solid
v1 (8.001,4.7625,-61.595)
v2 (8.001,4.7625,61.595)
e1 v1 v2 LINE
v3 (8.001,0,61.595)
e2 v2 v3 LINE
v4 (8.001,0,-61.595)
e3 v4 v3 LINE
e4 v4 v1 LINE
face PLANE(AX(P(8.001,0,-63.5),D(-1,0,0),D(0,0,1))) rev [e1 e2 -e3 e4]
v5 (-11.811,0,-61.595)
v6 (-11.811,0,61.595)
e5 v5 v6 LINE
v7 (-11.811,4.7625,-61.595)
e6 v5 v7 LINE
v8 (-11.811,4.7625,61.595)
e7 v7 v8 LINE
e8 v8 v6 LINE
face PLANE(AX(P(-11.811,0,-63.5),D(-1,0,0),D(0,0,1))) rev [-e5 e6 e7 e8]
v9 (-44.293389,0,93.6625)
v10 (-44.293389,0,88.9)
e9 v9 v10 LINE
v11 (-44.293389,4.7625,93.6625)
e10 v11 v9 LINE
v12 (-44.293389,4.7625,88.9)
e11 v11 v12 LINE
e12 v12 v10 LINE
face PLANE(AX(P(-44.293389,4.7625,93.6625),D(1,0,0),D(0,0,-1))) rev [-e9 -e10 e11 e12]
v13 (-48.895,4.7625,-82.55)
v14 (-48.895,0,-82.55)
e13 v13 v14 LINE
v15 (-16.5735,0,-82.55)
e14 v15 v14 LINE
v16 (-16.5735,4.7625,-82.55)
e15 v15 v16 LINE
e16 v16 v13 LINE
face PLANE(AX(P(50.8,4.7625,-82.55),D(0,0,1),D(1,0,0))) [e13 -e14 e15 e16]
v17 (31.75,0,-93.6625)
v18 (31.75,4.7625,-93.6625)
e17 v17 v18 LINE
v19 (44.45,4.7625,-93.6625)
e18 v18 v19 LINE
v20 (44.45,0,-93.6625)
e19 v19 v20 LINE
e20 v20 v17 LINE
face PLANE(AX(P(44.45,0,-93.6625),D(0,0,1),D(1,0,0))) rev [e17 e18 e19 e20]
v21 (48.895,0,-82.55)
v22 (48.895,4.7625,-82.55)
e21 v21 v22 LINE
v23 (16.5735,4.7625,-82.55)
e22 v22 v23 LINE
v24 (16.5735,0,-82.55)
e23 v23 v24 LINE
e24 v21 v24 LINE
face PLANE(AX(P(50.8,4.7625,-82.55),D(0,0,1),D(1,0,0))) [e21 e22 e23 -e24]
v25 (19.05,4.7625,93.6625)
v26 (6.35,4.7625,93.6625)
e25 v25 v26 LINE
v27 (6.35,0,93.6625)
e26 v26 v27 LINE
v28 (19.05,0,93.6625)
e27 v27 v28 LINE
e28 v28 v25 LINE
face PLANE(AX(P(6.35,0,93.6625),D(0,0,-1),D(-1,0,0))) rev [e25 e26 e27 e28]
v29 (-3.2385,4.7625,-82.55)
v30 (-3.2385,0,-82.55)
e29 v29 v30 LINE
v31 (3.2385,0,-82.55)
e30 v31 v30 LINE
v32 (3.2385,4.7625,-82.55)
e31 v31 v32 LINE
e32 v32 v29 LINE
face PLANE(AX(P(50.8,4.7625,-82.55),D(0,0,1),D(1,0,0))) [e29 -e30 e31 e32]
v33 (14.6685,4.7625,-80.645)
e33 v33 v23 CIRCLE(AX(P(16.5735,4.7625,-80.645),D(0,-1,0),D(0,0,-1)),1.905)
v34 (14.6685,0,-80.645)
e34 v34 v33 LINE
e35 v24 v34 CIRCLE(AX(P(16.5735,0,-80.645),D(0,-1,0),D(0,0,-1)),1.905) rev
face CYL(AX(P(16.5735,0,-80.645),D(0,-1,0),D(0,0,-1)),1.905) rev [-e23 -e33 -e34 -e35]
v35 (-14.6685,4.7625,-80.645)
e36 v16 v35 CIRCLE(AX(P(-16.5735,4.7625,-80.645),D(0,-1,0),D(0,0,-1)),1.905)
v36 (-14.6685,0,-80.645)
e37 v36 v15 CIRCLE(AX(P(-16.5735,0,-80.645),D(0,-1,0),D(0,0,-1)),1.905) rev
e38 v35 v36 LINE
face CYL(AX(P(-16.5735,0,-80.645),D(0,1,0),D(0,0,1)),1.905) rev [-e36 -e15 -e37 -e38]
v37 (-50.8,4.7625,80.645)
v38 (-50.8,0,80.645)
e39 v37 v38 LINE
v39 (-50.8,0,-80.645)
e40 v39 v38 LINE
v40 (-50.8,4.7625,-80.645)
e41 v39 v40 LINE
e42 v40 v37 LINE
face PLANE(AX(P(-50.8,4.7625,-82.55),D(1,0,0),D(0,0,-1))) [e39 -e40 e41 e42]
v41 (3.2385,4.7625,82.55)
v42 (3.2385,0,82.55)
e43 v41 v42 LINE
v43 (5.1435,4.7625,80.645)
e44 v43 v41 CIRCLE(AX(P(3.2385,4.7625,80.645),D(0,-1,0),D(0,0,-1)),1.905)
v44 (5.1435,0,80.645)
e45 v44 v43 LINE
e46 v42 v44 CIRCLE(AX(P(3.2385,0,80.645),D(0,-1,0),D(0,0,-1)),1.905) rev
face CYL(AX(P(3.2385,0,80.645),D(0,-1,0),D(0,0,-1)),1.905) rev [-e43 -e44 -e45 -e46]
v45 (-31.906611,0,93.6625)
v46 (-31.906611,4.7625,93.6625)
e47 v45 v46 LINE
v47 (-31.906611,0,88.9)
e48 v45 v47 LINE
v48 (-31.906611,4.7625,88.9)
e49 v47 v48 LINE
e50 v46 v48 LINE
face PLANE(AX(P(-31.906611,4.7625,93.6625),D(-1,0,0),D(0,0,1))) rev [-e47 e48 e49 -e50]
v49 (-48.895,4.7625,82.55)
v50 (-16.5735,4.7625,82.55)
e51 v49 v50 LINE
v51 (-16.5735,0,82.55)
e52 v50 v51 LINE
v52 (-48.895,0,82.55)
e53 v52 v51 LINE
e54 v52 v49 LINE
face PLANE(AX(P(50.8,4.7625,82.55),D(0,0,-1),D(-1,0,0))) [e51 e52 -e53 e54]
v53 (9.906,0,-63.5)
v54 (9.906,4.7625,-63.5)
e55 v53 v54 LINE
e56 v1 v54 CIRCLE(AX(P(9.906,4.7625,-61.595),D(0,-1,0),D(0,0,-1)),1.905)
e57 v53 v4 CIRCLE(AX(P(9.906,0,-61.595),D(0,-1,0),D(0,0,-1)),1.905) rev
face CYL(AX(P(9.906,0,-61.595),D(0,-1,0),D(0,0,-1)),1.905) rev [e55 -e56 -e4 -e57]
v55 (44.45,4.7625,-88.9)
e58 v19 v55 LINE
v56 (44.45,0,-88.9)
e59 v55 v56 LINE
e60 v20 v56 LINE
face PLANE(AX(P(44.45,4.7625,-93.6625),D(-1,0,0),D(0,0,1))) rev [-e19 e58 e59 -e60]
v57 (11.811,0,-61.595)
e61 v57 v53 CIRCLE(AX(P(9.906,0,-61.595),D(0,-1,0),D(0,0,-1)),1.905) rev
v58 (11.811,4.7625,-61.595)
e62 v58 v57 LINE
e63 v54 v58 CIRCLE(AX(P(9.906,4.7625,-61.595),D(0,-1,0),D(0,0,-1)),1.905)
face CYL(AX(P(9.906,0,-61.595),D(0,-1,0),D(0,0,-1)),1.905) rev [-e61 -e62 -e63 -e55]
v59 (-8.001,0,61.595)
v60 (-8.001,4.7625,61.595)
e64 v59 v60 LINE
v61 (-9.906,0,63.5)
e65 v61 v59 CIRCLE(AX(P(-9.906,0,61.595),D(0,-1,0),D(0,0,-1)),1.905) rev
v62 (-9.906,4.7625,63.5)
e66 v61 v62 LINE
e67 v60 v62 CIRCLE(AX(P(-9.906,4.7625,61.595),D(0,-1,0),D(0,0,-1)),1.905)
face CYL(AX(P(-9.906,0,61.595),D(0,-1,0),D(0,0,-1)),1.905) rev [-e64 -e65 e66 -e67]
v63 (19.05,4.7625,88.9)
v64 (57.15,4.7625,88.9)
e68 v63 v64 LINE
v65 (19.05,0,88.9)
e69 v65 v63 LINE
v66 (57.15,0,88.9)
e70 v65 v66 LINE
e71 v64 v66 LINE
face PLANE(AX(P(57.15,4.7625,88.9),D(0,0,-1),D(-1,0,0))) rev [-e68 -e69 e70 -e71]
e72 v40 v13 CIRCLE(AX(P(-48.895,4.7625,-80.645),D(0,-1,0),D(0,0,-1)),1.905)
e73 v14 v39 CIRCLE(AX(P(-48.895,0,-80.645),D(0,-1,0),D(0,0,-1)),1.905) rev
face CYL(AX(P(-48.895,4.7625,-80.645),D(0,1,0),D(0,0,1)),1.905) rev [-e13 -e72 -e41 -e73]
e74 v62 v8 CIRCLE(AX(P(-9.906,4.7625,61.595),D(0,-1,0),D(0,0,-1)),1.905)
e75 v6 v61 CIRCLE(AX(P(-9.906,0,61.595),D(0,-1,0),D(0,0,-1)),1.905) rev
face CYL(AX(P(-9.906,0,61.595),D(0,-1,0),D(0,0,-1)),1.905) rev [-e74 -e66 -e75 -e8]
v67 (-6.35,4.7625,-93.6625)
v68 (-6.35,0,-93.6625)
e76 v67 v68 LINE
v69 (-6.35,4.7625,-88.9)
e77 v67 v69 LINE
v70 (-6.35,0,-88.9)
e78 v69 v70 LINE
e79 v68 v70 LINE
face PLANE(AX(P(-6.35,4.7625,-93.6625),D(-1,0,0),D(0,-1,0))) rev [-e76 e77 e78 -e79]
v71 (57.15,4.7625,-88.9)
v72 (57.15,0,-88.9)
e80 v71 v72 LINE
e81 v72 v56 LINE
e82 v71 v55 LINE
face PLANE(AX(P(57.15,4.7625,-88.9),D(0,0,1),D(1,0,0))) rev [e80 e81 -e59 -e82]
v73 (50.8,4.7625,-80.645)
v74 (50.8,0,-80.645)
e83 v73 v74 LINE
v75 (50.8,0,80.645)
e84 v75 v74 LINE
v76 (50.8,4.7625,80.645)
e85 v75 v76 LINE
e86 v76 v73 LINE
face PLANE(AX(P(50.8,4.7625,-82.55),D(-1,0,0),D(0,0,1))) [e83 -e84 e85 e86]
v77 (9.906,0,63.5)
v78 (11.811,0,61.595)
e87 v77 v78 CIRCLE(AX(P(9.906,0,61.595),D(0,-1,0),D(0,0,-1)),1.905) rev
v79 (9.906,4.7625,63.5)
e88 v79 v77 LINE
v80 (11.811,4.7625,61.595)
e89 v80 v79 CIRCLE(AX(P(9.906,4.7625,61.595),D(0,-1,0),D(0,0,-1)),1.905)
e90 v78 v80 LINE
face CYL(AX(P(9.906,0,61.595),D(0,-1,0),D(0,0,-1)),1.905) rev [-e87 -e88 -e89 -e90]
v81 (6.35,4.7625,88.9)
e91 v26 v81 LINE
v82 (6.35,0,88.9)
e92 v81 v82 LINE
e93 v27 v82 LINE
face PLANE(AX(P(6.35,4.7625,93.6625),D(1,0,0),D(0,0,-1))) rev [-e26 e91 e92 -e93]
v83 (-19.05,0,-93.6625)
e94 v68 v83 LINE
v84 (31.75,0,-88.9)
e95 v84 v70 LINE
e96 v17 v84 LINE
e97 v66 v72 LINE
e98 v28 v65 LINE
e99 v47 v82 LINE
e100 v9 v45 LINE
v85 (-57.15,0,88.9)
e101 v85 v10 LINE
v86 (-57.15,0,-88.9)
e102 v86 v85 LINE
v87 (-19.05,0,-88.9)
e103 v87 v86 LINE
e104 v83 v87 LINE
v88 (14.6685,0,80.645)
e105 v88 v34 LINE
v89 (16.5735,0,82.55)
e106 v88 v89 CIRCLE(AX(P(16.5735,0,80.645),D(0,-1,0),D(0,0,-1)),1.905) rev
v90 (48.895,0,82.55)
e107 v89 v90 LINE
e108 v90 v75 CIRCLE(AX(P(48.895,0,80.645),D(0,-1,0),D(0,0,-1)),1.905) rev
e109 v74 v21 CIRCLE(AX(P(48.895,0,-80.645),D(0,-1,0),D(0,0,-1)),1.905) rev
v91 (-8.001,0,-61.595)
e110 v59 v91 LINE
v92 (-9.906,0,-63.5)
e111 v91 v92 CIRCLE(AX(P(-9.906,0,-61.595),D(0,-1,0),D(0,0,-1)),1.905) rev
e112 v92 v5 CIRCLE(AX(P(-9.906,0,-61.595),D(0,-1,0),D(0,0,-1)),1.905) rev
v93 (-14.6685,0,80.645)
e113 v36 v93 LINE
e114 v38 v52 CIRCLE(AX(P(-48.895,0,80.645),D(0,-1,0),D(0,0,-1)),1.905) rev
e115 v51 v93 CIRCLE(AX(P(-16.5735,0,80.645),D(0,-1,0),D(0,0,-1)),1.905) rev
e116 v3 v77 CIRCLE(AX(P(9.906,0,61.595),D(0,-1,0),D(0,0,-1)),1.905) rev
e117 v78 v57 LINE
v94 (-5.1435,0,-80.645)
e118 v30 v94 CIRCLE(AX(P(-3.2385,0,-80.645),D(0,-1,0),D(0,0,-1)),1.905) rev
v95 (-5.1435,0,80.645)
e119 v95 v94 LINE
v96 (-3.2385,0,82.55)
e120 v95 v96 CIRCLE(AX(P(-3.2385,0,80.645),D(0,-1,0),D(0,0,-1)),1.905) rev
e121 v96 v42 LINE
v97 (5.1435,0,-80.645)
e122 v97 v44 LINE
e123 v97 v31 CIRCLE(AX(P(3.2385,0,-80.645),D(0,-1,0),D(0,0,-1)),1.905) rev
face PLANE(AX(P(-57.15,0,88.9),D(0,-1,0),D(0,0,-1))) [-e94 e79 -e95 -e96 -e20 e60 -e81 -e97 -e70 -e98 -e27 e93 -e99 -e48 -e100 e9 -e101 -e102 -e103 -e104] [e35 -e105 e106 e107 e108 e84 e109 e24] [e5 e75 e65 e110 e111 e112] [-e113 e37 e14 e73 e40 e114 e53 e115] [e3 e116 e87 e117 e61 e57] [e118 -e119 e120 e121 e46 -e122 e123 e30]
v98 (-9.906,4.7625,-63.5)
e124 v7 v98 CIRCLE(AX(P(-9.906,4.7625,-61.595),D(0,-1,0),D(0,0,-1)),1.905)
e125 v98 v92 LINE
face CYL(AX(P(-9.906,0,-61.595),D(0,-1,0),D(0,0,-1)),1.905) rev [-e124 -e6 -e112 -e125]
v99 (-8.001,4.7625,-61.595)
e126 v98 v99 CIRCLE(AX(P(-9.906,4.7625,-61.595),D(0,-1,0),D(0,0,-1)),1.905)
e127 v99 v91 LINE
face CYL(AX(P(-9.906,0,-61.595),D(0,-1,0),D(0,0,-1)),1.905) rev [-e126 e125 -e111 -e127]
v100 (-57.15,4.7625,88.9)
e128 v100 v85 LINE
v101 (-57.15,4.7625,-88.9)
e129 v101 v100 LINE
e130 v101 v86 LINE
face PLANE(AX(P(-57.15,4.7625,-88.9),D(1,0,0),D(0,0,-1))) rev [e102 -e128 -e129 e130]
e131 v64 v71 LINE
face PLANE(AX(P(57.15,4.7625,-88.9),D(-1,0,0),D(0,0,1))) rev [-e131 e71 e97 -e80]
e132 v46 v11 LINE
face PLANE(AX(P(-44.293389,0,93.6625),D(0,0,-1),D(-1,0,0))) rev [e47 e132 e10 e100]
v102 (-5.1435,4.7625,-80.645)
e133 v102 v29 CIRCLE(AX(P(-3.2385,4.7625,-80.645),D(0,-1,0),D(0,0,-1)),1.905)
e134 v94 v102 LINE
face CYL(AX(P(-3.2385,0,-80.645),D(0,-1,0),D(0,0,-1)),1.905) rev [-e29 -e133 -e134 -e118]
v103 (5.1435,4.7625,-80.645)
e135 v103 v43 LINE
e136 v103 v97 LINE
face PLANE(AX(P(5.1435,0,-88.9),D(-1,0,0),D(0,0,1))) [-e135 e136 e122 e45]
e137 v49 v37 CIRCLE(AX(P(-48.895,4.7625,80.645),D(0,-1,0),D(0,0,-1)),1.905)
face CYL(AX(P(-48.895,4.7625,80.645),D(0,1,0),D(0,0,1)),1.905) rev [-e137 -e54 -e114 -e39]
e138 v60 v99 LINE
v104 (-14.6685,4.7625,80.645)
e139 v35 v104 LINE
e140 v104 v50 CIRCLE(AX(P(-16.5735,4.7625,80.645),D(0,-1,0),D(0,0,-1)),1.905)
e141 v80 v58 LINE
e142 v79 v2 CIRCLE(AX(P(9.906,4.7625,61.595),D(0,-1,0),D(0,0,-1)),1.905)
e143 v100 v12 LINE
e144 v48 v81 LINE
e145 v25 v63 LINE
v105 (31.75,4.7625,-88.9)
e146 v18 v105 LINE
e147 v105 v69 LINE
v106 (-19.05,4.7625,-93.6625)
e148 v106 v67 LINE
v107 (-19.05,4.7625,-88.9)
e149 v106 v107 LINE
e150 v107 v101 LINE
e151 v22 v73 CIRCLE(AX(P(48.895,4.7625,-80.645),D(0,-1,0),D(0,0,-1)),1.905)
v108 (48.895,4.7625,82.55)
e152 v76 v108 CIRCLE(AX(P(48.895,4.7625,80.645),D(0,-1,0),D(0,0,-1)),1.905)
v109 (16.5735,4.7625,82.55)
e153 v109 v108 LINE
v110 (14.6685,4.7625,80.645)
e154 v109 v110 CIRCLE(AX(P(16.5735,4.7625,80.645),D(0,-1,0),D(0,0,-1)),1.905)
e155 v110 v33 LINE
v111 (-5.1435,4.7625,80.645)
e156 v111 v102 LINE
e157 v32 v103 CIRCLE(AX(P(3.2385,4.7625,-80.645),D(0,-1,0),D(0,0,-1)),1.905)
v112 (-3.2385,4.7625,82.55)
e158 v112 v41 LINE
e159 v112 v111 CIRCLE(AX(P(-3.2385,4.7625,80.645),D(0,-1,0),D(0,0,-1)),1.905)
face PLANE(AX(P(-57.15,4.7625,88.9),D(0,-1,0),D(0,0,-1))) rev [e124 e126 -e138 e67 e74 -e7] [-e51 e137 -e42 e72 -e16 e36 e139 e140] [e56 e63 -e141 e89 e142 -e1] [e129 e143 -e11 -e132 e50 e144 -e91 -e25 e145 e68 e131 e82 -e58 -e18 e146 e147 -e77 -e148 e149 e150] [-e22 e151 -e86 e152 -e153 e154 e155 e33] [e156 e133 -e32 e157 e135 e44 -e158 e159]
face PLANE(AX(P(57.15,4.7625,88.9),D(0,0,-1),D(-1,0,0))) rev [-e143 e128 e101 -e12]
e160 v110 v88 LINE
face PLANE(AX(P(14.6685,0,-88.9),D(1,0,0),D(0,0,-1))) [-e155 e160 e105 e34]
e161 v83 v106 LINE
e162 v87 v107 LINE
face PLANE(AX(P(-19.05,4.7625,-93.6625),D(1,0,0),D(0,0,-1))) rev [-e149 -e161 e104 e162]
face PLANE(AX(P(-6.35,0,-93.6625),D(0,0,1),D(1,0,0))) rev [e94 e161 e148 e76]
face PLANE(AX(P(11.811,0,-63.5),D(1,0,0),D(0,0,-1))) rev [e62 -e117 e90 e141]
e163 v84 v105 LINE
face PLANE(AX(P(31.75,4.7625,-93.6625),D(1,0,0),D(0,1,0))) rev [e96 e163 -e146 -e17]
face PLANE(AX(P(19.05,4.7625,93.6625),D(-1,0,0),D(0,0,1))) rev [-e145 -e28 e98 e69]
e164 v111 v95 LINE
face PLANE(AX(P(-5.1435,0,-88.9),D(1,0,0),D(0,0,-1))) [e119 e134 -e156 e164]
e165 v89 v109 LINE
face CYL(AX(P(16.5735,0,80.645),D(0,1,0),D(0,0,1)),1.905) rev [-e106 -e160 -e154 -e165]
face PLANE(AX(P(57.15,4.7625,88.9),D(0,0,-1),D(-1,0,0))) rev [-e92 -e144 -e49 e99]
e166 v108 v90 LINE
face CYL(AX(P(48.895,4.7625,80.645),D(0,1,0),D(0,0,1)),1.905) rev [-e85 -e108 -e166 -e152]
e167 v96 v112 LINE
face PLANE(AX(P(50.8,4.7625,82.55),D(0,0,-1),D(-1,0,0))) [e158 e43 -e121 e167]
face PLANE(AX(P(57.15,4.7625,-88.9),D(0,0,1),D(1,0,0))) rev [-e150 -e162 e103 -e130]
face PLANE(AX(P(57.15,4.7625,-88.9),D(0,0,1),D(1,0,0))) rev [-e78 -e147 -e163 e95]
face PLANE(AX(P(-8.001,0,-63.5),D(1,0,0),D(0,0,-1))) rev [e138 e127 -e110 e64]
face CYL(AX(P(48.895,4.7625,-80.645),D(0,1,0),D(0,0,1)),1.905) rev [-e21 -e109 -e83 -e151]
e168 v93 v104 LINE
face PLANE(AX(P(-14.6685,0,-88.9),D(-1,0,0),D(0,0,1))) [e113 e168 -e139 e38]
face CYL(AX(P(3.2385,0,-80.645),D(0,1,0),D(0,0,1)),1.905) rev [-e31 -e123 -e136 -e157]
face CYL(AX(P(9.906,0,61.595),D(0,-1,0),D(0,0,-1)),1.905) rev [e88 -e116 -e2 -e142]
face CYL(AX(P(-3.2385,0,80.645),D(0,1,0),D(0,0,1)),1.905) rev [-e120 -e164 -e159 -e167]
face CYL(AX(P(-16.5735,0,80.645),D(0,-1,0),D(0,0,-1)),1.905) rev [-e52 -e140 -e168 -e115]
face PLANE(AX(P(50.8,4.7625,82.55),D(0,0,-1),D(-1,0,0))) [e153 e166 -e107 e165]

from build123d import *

# Parameters (mm, degrees)
SKETCH1_W           = 114.3
SKETCH1_H           = 177.8
SKETCH1_W_2         = 101.6
SKETCH1_H_2         = 165.1
BOSS_EXTRUDE1_DEPTH = 4.7625
SKETCH2_W           = 12.38677804
SKETCH2_H           = 4.7625
SKETCH2_W_2         = 12.7
BOSS_EXTRUDE2_DEPTH = 4.7625
SKETCH3_W           = 12.7
SKETCH3_H           = 4.7625
BOSS_EXTRUDE3_DEPTH = 4.7625
SKETCH4_W           = 9.525
SKETCH4_H           = 177.8
SKETCH4_W_2         = 3.81
SKETCH4_H_2         = 127
BOSS_EXTRUDE4_DEPTH = 4.7625
FILLET1_R           = 1.905


with BuildPart() as part:
    # Sketch1 → Boss-Extrude1 (new body)
    with BuildSketch(Plane(origin=(0, 0, 0), x_dir=(1, 0, 0), z_dir=(0, 1, 0))):
        Rectangle(SKETCH1_W, SKETCH1_H)
        Rectangle(SKETCH1_W_2, SKETCH1_H_2, mode=Mode.SUBTRACT)
    extrude(amount=BOSS_EXTRUDE1_DEPTH)

    # Sketch2 → Boss-Extrude2 (add)
    with BuildSketch(Plane.XY.offset(88.9)):
        with Locations((-38.1, 2.38125)):
            Rectangle(SKETCH2_W, SKETCH2_H)
        with Locations((12.7, 2.38125)):
            Rectangle(SKETCH2_W_2, SKETCH2_H)
    extrude(amount=BOSS_EXTRUDE2_DEPTH)

    # Sketch3 → Boss-Extrude3 (add)
    with BuildSketch(Plane(origin=(0, 0, -88.9), x_dir=(-1, 0, 0), z_dir=(0, 0, -1))):
        with Locations((-38.1, 2.38125)):
            Rectangle(SKETCH3_W, SKETCH3_H)
        with Locations((12.7, 2.38125)):
            Rectangle(SKETCH3_W, SKETCH3_H)
    extrude(amount=BOSS_EXTRUDE3_DEPTH)

    # Sketch4 → Boss-Extrude4 (add)
    # profile 1 of 2: a face of its own
    with BuildSketch(Plane(origin=(0, 4.7625, 0), x_dir=(-1, 0, 0), z_dir=(0, 1, 0))):
        with Locations((9.906, 0)):
            Rectangle(SKETCH4_W, SKETCH4_H)
        with Locations((9.906, 0)):
            Rectangle(SKETCH4_W_2, SKETCH4_H_2, mode=Mode.SUBTRACT)
    # profile 2 of 2: a face of its own
    with BuildSketch(Plane(origin=(0, 4.7625, 0), x_dir=(-1, 0, 0), z_dir=(0, 1, 0))):
        with Locations((-9.906, 0)):
            Rectangle(SKETCH4_W, SKETCH4_H)
        with Locations((-9.906, 0)):
            Rectangle(SKETCH4_W_2, SKETCH4_H_2, mode=Mode.SUBTRACT)
    extrude(amount=-BOSS_EXTRUDE4_DEPTH)

    # Fillet1
    fillet1_edges = [part.edges().sort_by_distance(p)[0] for p in [
        (-8.001, 2.38125, -63.5),
        (-11.811, 2.38125, -63.5),
        (8.001, 2.38125, -63.5),
        (11.811, 2.38125, -63.5),
        (-8.001, 2.38125, 63.5),
        (-11.811, 2.38125, 63.5),
        (8.001, 2.38125, 63.5),
        (11.811, 2.38125, 63.5),
        (-5.1435, 2.38125, 82.55),
        (5.1435, 2.38125, 82.55),
        (-5.1435, 2.38125, -82.55),
        (5.1435, 2.38125, -82.55),
        (-14.6685, 2.38125, -82.55),
        (-50.8, 2.38125, -82.55),
        (-50.8, 2.38125, 82.55),
        (-14.6685, 2.38125, 82.55),
        (14.6685, 2.38125, 82.55),
        (50.8, 2.38125, 82.55),
        (14.6685, 2.38125, -82.55),
        (50.8, 2.38125, -82.55),
    ]]
    fillet(fillet1_edges, radius=FILLET1_R - 0.0001)  # a hair under: the kernel refuses the full size


solid = part.part
